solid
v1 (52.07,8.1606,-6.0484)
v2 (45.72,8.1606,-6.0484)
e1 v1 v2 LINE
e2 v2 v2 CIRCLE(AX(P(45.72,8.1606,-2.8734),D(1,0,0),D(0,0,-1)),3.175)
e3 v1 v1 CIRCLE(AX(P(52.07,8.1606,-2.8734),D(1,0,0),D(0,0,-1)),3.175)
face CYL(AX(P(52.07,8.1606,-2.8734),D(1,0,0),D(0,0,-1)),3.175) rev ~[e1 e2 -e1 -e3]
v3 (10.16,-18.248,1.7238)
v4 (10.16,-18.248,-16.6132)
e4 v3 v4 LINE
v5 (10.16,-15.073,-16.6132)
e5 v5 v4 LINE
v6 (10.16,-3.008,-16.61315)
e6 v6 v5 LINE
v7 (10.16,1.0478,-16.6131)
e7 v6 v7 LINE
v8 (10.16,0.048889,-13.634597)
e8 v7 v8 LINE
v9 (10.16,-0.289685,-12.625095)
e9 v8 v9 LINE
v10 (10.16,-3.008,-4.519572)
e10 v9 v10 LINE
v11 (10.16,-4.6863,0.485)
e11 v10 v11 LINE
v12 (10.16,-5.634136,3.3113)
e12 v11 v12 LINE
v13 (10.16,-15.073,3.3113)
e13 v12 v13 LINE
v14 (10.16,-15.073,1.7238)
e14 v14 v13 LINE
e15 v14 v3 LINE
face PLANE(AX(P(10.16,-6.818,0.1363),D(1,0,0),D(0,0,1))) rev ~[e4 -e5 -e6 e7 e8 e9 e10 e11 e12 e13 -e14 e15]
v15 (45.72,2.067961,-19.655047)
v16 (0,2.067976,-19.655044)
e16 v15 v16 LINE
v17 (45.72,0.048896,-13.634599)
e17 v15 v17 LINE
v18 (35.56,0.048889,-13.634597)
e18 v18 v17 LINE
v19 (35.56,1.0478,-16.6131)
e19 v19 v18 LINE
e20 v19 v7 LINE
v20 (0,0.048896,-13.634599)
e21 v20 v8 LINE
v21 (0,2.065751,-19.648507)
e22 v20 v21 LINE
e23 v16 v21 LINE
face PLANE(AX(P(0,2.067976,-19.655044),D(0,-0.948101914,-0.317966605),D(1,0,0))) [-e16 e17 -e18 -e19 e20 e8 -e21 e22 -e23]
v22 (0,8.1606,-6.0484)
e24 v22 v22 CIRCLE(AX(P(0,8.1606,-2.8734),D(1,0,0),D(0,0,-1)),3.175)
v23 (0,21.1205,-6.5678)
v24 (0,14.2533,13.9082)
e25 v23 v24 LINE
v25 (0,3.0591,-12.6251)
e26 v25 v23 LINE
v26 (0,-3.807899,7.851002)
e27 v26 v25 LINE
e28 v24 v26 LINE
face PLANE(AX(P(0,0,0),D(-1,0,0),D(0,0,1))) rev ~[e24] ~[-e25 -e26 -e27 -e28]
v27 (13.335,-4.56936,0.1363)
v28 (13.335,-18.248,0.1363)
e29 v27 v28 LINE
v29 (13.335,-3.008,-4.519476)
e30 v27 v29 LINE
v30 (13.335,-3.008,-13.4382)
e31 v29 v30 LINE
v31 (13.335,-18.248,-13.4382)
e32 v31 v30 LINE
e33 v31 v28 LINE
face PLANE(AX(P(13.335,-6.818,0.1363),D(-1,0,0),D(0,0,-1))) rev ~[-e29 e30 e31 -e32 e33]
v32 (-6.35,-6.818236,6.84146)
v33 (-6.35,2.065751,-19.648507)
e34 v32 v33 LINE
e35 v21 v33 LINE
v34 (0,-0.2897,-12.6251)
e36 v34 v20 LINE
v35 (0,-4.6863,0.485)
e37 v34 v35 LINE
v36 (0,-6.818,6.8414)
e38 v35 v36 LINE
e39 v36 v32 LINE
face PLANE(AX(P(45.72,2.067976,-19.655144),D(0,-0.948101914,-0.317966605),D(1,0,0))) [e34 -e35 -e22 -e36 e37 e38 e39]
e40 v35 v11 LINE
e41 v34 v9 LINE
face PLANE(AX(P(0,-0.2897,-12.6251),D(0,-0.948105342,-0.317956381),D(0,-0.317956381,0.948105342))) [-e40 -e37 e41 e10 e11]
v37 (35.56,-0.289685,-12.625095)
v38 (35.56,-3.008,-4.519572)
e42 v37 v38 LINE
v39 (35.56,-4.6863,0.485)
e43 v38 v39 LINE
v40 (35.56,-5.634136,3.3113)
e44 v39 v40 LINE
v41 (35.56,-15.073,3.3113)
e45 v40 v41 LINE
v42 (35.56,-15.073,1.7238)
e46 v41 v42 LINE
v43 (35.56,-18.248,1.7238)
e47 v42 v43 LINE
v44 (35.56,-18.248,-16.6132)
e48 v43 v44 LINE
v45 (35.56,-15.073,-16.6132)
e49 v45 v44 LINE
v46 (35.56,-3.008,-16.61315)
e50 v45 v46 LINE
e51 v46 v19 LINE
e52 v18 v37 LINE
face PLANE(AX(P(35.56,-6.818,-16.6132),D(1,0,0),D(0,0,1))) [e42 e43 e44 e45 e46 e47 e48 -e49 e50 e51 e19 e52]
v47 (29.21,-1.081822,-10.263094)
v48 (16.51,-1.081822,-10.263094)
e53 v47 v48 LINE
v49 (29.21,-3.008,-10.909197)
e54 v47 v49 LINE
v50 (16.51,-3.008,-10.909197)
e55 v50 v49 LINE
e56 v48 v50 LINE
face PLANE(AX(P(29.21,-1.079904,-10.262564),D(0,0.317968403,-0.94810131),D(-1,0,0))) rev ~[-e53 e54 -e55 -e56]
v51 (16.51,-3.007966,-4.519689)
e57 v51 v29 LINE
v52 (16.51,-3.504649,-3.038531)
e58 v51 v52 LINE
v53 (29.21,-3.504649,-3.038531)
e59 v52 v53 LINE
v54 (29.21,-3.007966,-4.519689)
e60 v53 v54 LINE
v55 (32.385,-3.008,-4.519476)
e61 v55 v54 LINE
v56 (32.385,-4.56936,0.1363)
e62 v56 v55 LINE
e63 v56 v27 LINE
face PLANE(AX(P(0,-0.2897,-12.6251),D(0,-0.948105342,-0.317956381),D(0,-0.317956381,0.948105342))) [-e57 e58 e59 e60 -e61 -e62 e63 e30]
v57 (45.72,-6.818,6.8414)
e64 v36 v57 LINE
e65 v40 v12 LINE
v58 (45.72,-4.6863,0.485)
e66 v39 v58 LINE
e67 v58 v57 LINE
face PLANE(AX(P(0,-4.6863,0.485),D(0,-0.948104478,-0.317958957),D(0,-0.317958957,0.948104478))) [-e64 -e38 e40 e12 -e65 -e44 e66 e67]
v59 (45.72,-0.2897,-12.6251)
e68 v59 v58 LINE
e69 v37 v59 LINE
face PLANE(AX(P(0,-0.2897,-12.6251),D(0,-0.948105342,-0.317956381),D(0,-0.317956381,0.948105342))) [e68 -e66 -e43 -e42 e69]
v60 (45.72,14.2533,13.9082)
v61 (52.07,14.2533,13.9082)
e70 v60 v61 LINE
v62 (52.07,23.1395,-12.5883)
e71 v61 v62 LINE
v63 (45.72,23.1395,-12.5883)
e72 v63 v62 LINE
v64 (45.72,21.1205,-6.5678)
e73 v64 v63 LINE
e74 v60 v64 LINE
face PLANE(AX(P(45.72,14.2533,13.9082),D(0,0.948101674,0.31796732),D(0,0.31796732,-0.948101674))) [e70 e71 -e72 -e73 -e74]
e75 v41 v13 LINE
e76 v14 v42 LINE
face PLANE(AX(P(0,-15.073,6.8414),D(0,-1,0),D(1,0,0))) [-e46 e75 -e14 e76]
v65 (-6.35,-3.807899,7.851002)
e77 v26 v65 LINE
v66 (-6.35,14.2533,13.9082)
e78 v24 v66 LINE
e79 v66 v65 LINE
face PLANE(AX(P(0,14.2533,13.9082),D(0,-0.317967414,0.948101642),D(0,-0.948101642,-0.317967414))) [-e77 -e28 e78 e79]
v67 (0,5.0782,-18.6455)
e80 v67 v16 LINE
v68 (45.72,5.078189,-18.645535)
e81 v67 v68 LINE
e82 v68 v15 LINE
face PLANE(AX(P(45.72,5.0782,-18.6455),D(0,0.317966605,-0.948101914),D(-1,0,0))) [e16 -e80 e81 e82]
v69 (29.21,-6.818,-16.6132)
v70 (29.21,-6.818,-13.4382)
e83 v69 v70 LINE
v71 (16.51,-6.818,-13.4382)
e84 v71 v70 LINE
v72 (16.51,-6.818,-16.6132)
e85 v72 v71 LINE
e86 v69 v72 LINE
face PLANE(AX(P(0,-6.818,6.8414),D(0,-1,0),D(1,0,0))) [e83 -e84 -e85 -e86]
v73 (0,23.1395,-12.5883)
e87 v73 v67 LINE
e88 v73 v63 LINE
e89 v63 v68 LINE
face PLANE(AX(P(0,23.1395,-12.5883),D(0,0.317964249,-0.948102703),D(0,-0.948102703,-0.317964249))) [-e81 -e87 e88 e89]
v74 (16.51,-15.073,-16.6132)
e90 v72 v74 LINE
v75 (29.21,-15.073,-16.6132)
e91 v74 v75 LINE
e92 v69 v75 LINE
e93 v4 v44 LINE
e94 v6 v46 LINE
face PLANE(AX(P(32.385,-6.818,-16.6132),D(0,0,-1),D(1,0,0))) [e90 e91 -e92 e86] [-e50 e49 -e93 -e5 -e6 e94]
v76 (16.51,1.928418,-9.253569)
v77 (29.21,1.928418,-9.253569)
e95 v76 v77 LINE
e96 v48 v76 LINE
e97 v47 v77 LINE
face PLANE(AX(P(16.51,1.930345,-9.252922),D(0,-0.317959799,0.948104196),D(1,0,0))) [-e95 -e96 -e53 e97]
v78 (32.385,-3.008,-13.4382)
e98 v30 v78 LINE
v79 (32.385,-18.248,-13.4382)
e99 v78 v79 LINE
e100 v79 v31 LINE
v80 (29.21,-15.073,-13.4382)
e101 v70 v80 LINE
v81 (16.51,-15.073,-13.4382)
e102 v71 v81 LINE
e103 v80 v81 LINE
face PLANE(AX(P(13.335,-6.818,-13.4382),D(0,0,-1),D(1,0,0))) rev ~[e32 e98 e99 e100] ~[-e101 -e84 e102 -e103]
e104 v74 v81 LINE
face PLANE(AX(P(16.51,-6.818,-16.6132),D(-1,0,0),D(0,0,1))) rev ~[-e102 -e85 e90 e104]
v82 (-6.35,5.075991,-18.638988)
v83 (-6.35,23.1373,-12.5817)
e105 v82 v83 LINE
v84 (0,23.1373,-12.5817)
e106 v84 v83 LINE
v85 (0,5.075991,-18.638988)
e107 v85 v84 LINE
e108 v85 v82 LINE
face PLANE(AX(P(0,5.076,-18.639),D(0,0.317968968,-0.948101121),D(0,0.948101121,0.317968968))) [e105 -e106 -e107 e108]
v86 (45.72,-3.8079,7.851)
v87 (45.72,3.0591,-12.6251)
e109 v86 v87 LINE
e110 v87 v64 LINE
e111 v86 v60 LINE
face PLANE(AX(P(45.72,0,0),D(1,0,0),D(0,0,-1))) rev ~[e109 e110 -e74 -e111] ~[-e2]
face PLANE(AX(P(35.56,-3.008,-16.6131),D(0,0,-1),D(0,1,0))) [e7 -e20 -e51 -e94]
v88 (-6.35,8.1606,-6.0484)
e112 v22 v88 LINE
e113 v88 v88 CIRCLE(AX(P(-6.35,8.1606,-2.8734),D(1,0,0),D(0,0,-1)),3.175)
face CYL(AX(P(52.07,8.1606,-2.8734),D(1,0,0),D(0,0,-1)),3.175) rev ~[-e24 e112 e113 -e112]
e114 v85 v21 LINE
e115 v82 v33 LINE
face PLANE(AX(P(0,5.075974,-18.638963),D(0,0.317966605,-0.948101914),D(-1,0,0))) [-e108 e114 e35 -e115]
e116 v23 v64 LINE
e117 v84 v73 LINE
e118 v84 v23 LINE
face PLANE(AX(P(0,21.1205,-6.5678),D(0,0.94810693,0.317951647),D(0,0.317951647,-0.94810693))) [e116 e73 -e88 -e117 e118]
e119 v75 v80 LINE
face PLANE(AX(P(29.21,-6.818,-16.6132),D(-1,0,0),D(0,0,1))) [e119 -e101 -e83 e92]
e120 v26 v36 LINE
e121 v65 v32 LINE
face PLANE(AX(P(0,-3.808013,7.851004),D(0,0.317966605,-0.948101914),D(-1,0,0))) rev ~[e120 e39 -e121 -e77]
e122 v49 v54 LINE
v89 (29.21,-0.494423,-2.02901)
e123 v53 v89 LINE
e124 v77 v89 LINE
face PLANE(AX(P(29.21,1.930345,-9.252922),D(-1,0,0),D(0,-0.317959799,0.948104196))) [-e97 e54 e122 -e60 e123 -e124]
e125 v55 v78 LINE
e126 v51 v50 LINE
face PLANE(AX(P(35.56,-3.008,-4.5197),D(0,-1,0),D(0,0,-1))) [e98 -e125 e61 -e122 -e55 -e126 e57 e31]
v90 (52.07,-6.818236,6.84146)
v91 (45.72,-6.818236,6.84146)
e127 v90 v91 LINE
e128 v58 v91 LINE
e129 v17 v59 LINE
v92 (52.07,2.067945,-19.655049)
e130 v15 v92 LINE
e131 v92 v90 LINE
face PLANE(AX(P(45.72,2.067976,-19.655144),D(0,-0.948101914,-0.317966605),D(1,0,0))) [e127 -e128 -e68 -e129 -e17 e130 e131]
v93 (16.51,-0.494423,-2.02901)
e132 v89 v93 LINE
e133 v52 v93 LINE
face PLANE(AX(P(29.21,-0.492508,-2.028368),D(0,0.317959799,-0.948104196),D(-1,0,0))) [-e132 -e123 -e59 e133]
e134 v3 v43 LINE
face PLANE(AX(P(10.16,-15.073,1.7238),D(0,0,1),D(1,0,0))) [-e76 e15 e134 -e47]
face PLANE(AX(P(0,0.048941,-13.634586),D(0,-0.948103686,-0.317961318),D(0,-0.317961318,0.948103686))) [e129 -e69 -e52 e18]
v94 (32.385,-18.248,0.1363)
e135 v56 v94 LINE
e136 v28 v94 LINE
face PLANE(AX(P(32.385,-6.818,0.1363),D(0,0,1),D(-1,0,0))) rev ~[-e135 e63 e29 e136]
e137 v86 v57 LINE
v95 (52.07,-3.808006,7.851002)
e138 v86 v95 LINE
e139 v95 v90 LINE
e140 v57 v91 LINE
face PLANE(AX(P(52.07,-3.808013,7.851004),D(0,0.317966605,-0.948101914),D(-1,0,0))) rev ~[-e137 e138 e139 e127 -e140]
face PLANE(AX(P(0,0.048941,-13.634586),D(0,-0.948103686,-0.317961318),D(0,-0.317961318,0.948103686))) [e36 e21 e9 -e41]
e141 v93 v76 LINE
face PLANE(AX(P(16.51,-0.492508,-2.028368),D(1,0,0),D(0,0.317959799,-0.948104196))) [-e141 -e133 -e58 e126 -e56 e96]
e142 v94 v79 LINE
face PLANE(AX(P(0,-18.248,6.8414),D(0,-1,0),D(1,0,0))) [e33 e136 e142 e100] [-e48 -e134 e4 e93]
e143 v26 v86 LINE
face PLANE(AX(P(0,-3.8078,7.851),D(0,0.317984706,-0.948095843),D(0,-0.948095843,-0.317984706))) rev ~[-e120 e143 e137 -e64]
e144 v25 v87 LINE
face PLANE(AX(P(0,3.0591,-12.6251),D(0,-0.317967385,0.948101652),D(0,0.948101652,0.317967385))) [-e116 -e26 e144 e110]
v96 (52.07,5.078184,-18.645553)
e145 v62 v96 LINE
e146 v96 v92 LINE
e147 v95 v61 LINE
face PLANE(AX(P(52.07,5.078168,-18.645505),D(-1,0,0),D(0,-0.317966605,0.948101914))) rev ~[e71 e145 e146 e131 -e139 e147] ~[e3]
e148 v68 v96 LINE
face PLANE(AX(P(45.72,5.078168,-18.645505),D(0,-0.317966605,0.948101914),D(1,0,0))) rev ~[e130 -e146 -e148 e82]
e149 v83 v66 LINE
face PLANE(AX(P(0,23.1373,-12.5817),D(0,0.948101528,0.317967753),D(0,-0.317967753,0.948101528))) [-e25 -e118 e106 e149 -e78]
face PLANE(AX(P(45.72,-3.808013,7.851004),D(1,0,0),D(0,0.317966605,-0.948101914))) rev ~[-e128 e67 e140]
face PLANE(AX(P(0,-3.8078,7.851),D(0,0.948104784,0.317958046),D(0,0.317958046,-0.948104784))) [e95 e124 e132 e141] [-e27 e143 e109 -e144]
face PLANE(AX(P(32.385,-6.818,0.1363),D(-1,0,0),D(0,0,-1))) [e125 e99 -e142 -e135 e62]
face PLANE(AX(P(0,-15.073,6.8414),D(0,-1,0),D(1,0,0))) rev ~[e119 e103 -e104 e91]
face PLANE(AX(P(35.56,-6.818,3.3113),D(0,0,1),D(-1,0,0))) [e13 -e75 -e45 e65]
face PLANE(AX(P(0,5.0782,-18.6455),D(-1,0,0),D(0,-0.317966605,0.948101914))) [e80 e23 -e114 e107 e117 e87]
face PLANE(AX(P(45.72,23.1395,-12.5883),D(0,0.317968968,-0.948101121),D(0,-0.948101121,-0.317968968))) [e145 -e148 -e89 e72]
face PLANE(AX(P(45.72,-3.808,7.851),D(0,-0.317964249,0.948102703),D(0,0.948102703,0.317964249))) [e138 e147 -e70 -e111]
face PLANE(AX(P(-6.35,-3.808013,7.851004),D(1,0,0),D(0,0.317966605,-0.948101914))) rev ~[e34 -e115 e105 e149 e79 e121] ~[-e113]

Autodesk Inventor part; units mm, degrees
ref_plane "YZ Plane" through (0, 0, 0) normal (1, 0, 0) x (0, 1, 0)
ref_plane "XZ Plane" through (0, 0, 0) normal (0, 1, 0) x (-1, 0, 0)
sketch "Sketch8" plane through (0, 0, 0) normal (1, 0, 0) x (0, 1, 0)
  line L0 (-3.8078, 7.851) -> (3.0591, -12.6251)
  line L1 (-0.2897, -12.6251) -> (-4.6863, 0.485)
  line L2 (3.0591, -12.6251) -> (-0.2897, -12.6251)
  line L3 (-4.6863, 0.485) -> (-6.818, 6.8414)
  line L4 (-3.8078, 7.851) -> (-6.818, 6.8414)
  point P0 (0, 0)
extrude "Extrusion6" add sketch "Sketch8" along normal blind 45.72
sketch "Sketch11" plane through (0, 0, 0) normal (-1, 0, 0) x (0, 0, 1)
  line L0 (0.485, -4.6863) -> (-12.6251, -0.2897) projected
  line L1 (7.851, -6.8159) -> (0.485, -6.8159) projected
  line L2 (7.851, -6.8159) -> (0.485, -6.8159)
  line L3 (0.485, -6.8159) -> (0.485, -4.6863)
  line L4 (-12.6251, -0.2897) -> (0.485, -4.6863)
  line L5 (7.851, -3.8078) -> (-12.6251, 3.0591) projected
  line L6 (0.485, -6.8159) -> (7.851, -6.8159) projected
  line L7 (13.9082, 14.2533) -> (7.851, -3.808)
  line L8 (7.851, -3.808) -> (-18.639, 5.076)
  line L9 (-18.639, 5.076) -> (-12.5817, 23.1373)
  line L10 (-12.5817, 23.1373) -> (13.9082, 14.2533)
  point P0 (0, 0)
  dimension "d73" = 27.94
  dimension "d74" = 18.54
  dimension "d76" = 0
  dimension "d88" = 19.05
extrude "Extrusion8" add sketch "Sketch11" along normal blind 6.35
sketch "Sketch13" plane through (0, -3.8078, 7.851) normal (0, 0.9481042, 0.3179598) x (1, 0, 0)
  line L0 (0, 0) -> (0, 21.5968) projected
  line L1 (16.51, 18.0408) -> (29.21, 18.0408)
  line L2 (29.21, 18.0408) -> (29.21, 10.4208)
  line L3 (29.21, 10.4208) -> (16.51, 10.4208)
  line L4 (16.51, 10.4208) -> (16.51, 18.0408)
  point P0 (0, 8.6543)
  dimension "d55" = 7.62
  dimension "d56" = 12.7
  dimension "d57" = 16.51
extrude "Extrusion10" cut sketch "Sketch13" against normal blind 25.4
sketch "Sketch15" plane through (0, 0, 0) normal (1, 0, 0) x (0, 0, -1)
  line L0 (-0.485, -6.8159) -> (-7.851, -6.8159) projected
  line L1 (6.5678, 21.1205) -> (12.5883, 23.1395)
  line L2 (12.5883, 23.1395) -> (18.6455, 5.0782)
  line L3 (18.6455, 5.0782) -> (12.6251, 3.0591)
  line L4 (12.6251, 3.0591) -> (6.5678, 21.1205)
  dimension "d67" = 6.35
  dimension "d68" = 18.54
  dimension "d69" = 0
  dimension "d70" = 0
  dimension "d87" = 19.05
extrude "Extrusion11" add sketch "Sketch15" along normal blind 45.72
sketch "Sketch17" plane through (45.72, 0, 0) normal (1, 0, 0) x (0, 0, -1)
  line L0 (-7.851, -3.808) -> (-13.9082, 14.2533) projected
  line L1 (-7.851, -3.808) -> (-13.9082, 14.2533)
  line L2 (-13.9082, 14.2533) -> (12.5883, 23.1395)
  line L3 (12.5883, 23.1395) -> (18.6456, 5.0782)
  line L4 (18.6456, 5.0782) -> (-7.851, -3.808)
  point P0 (0, 0)
extrude "Extrusion12" add sketch "Sketch17" along normal blind 6.35
sketch "Sketch19" plane through (45.72, 5.0782, -18.6456) normal (0, -0.9481019, -0.3179666) x (1, 0, 0)
  line L0 (0, 6.3501) -> (0, 0.0001) projected
  line L1 (6.35, 27.947) -> (0, 27.947)
  line L2 (0, 27.947) -> (0, 0.0001)
  line L3 (0, 0.0001) -> (6.35, 0.0001)
  line L4 (6.35, 0.0001) -> (6.35, 27.947)
  line L5 (-45.72, 6.3501) -> (0, 6.3501) projected
  line L6 (0, 0.0001) -> (0, 0.0001)
  line L7 (0, 0.0001) -> (0, 6.3501)
  line L8 (0, 6.3501) -> (0, 6.3501)
  line L9 (0, 6.3501) -> (0, 0.0001)
  line L10 (-45.72, 0.007) -> (-52.07, 0.007) projected
  line L11 (-52.07, 0.007) -> (-45.72, 0.007)
  line L12 (-45.72, 0.007) -> (-45.72, 27.947)
  line L13 (-45.72, 27.947) -> (-52.07, 27.947)
  line L14 (-52.07, 27.947) -> (-52.07, 0.007)
  point P0 (-45.72, 19.2926)
extrude "Extrusion13" add sketch "Sketch19" along normal blind 3.175
sketch "Sketch20" plane through (0, 5.0782, -18.6455) normal (0, -0.9481019, -0.3179666) x (1, 0, 0)
  line L0 (45.72, 0) -> (0, 0)
  line L1 (0, 0) -> (0, 6.35)
  line L2 (0, 6.35) -> (45.72, 6.35)
  line L3 (45.72, 6.35) -> (45.72, 0)
  point P0 (0, 19.2926)
extrude "Extrusion14" add sketch "Sketch20" along normal blind 3.175
sketch "Sketch21" plane through (0, 0, 0) normal (1, 0, 0) x (0, 0, -1)
  line L0 (19.6485, 2.0658) -> (13.6346, 0.0489) projected
  line L1 (13.6346, 0.0489) -> (12.6251, 3.0591) projected
  line L2 (12.6251, 3.0591) -> (12.6251, -0.2897) projected
  line L3 (12.6251, -0.2897) -> (-6.8414, -6.818) projected
  line L4 (-0.485, -4.6863) -> (-0.485, -4.6865) projected
  line L5 (19.6485, 2.0657) -> (-6.8414, -6.8182) projected
  line L6 (19.6485, 2.0657) -> (19.6485, 2.0658) projected
  line L7 (12.6251, 3.0591) -> (13.6346, 0.0489)
  line L8 (12.6251, -0.2897) -> (13.6346, 0.0489)
  line L9 (12.6251, 3.0591) -> (12.6251, -0.2897)
  point P0 (0, 0)
  point P1 (-6.8415, -6.8181)
extrude "Extrusion15" add sketch "Sketch21" along normal blind 45.72
sketch "Sketch22" plane through (16.51, -1.0818, -10.2631) normal (0, 0.9481042, 0.3179598) x (1, 0, 0)
  line L0 (12.7, -7.62) -> (12.7, 0) projected
  line L1 (12.7, 0) -> (0, 0) projected
  line L2 (0, 0) -> (12.7, 0)
  line L3 (12.7, 0) -> (12.7, -7.62)
  line L4 (12.7, -7.62) -> (0, -7.62)
  line L5 (0, -7.62) -> (0, 0)
  point P0 (-16.51, -9.3866)
extrude "Extrusion16" cut sketch "Sketch22" against normal blind 45.72
sketch "Sketch23" plane through (52.07, 0, 0) normal (1, 0, 0) x (0, 0, -1)
  circle A0 centre (2.8734, 8.1606) radius 3.175
  point P0 (0, 0)
  dimension "d89" = 6.35
extrude "Extrusion17" cut sketch "Sketch23" against normal blind 76.2
ref_plane "Work Plane1" through (0, -6.818, 6.8414) normal (0, -1, 0) x (1, 0, 0)
sketch "Sketch25" plane through (0, -6.818, 6.8414) normal (0, -1, 0) x (1, 0, 0)
  line L0 (35.56, -20.2796) -> (35.56, -3.5301)
  line L1 (35.56, -3.5301) -> (32.385, -3.5301)
  line L2 (32.385, -3.5301) -> (32.385, -20.2796)
  line L3 (32.385, -6.7051) -> (10.16, -6.7051)
  line L4 (10.16, -6.7051) -> (10.16, -3.5301)
  line L5 (10.16, -3.5301) -> (32.385, -3.5301)
  line L6 (32.385, -3.5301) -> (32.385, -6.7051)
  line L7 (10.16, -6.7051) -> (13.335, -6.7051)
  line L8 (13.335, -6.7051) -> (13.335, -20.2796)
  line L9 (10.16, -20.2796) -> (10.16, -6.7051)
  line L10 (13.335, -20.2796) -> (32.385, -20.2796)
  line L11 (32.385, -20.2796) -> (32.385, -23.4546)
  line L12 (32.385, -23.4546) -> (13.335, -23.4546)
  line L13 (13.335, -23.4546) -> (13.335, -20.2796)
  line L14 (29.21, -17.1046) -> (16.51, -17.1046) projected
  line L15 (29.21, -9.8801) -> (29.21, -17.1046) projected
  line L16 (16.51, -9.8801) -> (29.21, -9.8801) projected
  line L17 (16.51, -17.1046) -> (16.51, -9.8801) projected
  line L18 (32.385, -23.4546) -> (35.56, -23.4546)
  line L19 (35.56, -23.4546) -> (35.56, -3.5301)
  line L20 (35.56, -3.5301) -> (32.385, -3.5301)
  line L21 (32.385, -3.5301) -> (32.385, -23.4546)
  line L22 (32.385, -3.5301) -> (10.16, -3.5301)
  line L23 (10.16, -3.5301) -> (10.16, -6.7051)
  line L24 (10.16, -6.7051) -> (32.385, -6.7051)
  line L25 (32.385, -6.7051) -> (32.385, -3.5301)
  line L26 (10.16, -6.7051) -> (13.335, -6.7051)
  line L27 (13.335, -6.7051) -> (13.335, -23.4546)
  line L28 (13.335, -23.4546) -> (10.16, -23.4546)
  line L29 (10.16, -23.4546) -> (10.16, -6.7051)
  line L30 (32.385, -20.2796) -> (13.335, -20.2796)
  line L31 (13.335, -20.2796) -> (13.335, -23.4546)
  line L32 (13.335, -23.4546) -> (32.385, -23.4546)
  line L33 (32.385, -23.4546) -> (32.385, -20.2796)
  line L34 (35.56, -3.5301) -> (32.385, -3.5301)
  line L35 (32.385, -3.5301) -> (32.385, -23.4546)
  line L36 (32.385, -23.4546) -> (35.56, -23.4546)
  line L37 (35.56, -23.4546) -> (35.56, -3.5301)
  point P0 (0, -6.8414)
  dimension "d102" = 3.175
  dimension "d103" = 3.175
  dimension "d104" = 3.175
  dimension "d105" = 3.175
  dimension "d106" = 3.175
  dimension "d107" = 3.175
  dimension "d108" = 3.175
  dimension "d109" = 3.175
extrude "Extrusion18" add sketch "Sketch25" against normal blind 3.81 contours L19 L18 L11 L2 L1 L0 | L2 L3 L4 L5 | L12 L13 L10 L11 | L28 L29 L9 L3 L8 L13
sketch "Sketch26" plane through (35.56, -6.818, 3.3114) normal (1, 0, 0) x (0, 0, -1)
  line L0 (7.8311, 3.81) -> (19.9245, 3.81) projected
  line L1 (7.8311, 3.81) -> (19.9245, 3.81)
  line L2 (19.9245, 3.81) -> (19.9245, 7.8658)
  line L3 (19.9245, 7.8658) -> (7.8311, 3.81)
  point P0 (3.3114, 6.818)
extrude "Extrusion19" add sketch "Sketch26" against normal blind 25.4
sketch "Sketch27" plane through (16.51, -1.0818, -10.2632) normal (0, 0.9481013, 0.3179684) x (1, 0, 0)
  line L0 (0, -6.0578) -> (12.7, -6.0578)
  line L1 (12.7, -6.0578) -> (12.7, 0)
  line L2 (12.7, 0) -> (0, 0)
  line L3 (0, 0) -> (0, -6.0578)
  point P0 (-16.51, -9.3865)
extrude "Extrusion20" cut sketch "Sketch27" against normal blind 25.4
sketch "Sketch28" plane through (0, -6.818, 6.8414) normal (0, -1, 0) x (1, 0, 0)
  line L0 (10.16, -3.5301) -> (10.16, -23.4546) projected
  line L1 (35.56, -23.4546) -> (35.56, -3.5301) projected
  line L2 (35.56, -3.5301) -> (10.16, -3.5301) projected
  line L3 (32.385, -6.7051) -> (13.335, -6.7051) projected
  line L4 (32.385, -6.7051) -> (32.385, -20.2796) projected
  line L5 (32.385, -20.2796) -> (13.335, -20.2796) projected
  line L6 (13.335, -20.2796) -> (13.335, -6.7051) projected
  line L7 (35.56, -23.4546) -> (29.21, -23.4546)
  line L8 (29.21, -23.4546) -> (29.21, -20.2796)
  line L9 (29.21, -20.2796) -> (35.56, -20.2796)
  line L10 (35.56, -20.2796) -> (35.56, -23.4546)
  line L11 (10.16, -23.4546) -> (16.51, -23.4546)
  line L12 (16.51, -23.4546) -> (16.51, -20.2796)
  line L13 (16.51, -20.2796) -> (10.16, -20.2796)
  line L14 (10.16, -20.2796) -> (10.16, -23.4546)
  line L15 (13.335, -6.7051) -> (13.335, -11.3612) projected
  line L16 (10.16, -20.2796) -> (13.335, -20.2796)
  line L17 (13.335, -20.2796) -> (13.335, -6.7051)
  line L18 (13.335, -6.7051) -> (10.16, -6.7051)
  line L19 (10.16, -6.7051) -> (10.16, -20.2796)
  line L20 (10.16, -3.5301) -> (35.56, -3.5301) projected
  line L21 (10.16, -6.7051) -> (35.56, -6.7051)
  line L22 (35.56, -6.7051) -> (35.56, -3.5301)
  line L23 (35.56, -3.5301) -> (10.16, -3.5301)
  line L24 (10.16, -3.5301) -> (10.16, -6.7051)
  line L25 (35.56, -6.7051) -> (32.385, -6.7051)
  line L26 (32.385, -6.7051) -> (32.385, -20.2796)
  line L27 (32.385, -20.2796) -> (35.56, -20.2796)
  line L28 (35.56, -20.2796) -> (35.56, -6.7051)
  point P0 (0, -6.8414)
  dimension "d116" = 6.35
  dimension "d117" = 6.35
extrude "Extrusion21" add sketch "Sketch28" along normal blind 8.255 contours L2 L1 L21 L3 L18 L0 | L18 L6 L13 L0 | L13 L5 L12 L11 L0 | L1 L9 L4 L21 | L1 L7 L8 L5 L9
sketch "Sketch29" plane through (0, -15.073, 6.8414) normal (0, -1, 0) x (1, 0, 0)
  line L0 (35.56, -6.3565) -> (35.56, -23.4546) projected
  line L1 (10.16, -23.4546) -> (35.56, -23.4546)
  line L2 (35.56, -23.4546) -> (35.56, -20.2796)
  line L3 (35.56, -20.2796) -> (10.16, -20.2796)
  line L4 (10.16, -20.2796) -> (10.16, -23.4546)
  line L5 (10.16, -23.4546) -> (10.16, -6.3565) projected
  line L6 (10.16, -6.7051) -> (35.56, -6.7051)
  line L7 (35.56, -6.7051) -> (32.385, -6.7051)
  line L8 (32.385, -6.7051) -> (32.385, -20.2796)
  line L9 (32.385, -20.2796) -> (35.56, -20.2796)
  line L10 (35.56, -20.2796) -> (35.56, -6.7051)
  line L11 (13.335, -6.7051) -> (10.16, -6.7051)
  line L12 (10.16, -6.7051) -> (10.16, -20.2796)
  line L13 (10.16, -20.2796) -> (13.335, -20.2796)
  line L14 (13.335, -20.2796) -> (13.335, -6.7051)
  line L15 (10.16, -6.3565) -> (10.16, -3.5301) projected
  line L16 (35.56, -6.7051) -> (10.16, -6.7051)
  line L17 (10.16, -6.7051) -> (10.16, -5.1176)
  line L18 (10.16, -5.1176) -> (35.56, -5.1176)
  line L19 (35.56, -5.1176) -> (35.56, -6.7051)
  point P0 (35.56, -3.5301)
  point P1 (0, -6.8414)
  dimension "d124" = 1.5875
extrude "Extrusion22" add sketch "Sketch29" along normal blind 3.175 contours L0 L6 L5 L15 L18 L19 | L0 L3 L8 L6 | L0 L1 L4 L3 | L14 L3 L5 L6
equation "\"d57\" = d58"
equation "\"d58\" = 16.51"
properties part number "Lidar Sensor Case v2"
